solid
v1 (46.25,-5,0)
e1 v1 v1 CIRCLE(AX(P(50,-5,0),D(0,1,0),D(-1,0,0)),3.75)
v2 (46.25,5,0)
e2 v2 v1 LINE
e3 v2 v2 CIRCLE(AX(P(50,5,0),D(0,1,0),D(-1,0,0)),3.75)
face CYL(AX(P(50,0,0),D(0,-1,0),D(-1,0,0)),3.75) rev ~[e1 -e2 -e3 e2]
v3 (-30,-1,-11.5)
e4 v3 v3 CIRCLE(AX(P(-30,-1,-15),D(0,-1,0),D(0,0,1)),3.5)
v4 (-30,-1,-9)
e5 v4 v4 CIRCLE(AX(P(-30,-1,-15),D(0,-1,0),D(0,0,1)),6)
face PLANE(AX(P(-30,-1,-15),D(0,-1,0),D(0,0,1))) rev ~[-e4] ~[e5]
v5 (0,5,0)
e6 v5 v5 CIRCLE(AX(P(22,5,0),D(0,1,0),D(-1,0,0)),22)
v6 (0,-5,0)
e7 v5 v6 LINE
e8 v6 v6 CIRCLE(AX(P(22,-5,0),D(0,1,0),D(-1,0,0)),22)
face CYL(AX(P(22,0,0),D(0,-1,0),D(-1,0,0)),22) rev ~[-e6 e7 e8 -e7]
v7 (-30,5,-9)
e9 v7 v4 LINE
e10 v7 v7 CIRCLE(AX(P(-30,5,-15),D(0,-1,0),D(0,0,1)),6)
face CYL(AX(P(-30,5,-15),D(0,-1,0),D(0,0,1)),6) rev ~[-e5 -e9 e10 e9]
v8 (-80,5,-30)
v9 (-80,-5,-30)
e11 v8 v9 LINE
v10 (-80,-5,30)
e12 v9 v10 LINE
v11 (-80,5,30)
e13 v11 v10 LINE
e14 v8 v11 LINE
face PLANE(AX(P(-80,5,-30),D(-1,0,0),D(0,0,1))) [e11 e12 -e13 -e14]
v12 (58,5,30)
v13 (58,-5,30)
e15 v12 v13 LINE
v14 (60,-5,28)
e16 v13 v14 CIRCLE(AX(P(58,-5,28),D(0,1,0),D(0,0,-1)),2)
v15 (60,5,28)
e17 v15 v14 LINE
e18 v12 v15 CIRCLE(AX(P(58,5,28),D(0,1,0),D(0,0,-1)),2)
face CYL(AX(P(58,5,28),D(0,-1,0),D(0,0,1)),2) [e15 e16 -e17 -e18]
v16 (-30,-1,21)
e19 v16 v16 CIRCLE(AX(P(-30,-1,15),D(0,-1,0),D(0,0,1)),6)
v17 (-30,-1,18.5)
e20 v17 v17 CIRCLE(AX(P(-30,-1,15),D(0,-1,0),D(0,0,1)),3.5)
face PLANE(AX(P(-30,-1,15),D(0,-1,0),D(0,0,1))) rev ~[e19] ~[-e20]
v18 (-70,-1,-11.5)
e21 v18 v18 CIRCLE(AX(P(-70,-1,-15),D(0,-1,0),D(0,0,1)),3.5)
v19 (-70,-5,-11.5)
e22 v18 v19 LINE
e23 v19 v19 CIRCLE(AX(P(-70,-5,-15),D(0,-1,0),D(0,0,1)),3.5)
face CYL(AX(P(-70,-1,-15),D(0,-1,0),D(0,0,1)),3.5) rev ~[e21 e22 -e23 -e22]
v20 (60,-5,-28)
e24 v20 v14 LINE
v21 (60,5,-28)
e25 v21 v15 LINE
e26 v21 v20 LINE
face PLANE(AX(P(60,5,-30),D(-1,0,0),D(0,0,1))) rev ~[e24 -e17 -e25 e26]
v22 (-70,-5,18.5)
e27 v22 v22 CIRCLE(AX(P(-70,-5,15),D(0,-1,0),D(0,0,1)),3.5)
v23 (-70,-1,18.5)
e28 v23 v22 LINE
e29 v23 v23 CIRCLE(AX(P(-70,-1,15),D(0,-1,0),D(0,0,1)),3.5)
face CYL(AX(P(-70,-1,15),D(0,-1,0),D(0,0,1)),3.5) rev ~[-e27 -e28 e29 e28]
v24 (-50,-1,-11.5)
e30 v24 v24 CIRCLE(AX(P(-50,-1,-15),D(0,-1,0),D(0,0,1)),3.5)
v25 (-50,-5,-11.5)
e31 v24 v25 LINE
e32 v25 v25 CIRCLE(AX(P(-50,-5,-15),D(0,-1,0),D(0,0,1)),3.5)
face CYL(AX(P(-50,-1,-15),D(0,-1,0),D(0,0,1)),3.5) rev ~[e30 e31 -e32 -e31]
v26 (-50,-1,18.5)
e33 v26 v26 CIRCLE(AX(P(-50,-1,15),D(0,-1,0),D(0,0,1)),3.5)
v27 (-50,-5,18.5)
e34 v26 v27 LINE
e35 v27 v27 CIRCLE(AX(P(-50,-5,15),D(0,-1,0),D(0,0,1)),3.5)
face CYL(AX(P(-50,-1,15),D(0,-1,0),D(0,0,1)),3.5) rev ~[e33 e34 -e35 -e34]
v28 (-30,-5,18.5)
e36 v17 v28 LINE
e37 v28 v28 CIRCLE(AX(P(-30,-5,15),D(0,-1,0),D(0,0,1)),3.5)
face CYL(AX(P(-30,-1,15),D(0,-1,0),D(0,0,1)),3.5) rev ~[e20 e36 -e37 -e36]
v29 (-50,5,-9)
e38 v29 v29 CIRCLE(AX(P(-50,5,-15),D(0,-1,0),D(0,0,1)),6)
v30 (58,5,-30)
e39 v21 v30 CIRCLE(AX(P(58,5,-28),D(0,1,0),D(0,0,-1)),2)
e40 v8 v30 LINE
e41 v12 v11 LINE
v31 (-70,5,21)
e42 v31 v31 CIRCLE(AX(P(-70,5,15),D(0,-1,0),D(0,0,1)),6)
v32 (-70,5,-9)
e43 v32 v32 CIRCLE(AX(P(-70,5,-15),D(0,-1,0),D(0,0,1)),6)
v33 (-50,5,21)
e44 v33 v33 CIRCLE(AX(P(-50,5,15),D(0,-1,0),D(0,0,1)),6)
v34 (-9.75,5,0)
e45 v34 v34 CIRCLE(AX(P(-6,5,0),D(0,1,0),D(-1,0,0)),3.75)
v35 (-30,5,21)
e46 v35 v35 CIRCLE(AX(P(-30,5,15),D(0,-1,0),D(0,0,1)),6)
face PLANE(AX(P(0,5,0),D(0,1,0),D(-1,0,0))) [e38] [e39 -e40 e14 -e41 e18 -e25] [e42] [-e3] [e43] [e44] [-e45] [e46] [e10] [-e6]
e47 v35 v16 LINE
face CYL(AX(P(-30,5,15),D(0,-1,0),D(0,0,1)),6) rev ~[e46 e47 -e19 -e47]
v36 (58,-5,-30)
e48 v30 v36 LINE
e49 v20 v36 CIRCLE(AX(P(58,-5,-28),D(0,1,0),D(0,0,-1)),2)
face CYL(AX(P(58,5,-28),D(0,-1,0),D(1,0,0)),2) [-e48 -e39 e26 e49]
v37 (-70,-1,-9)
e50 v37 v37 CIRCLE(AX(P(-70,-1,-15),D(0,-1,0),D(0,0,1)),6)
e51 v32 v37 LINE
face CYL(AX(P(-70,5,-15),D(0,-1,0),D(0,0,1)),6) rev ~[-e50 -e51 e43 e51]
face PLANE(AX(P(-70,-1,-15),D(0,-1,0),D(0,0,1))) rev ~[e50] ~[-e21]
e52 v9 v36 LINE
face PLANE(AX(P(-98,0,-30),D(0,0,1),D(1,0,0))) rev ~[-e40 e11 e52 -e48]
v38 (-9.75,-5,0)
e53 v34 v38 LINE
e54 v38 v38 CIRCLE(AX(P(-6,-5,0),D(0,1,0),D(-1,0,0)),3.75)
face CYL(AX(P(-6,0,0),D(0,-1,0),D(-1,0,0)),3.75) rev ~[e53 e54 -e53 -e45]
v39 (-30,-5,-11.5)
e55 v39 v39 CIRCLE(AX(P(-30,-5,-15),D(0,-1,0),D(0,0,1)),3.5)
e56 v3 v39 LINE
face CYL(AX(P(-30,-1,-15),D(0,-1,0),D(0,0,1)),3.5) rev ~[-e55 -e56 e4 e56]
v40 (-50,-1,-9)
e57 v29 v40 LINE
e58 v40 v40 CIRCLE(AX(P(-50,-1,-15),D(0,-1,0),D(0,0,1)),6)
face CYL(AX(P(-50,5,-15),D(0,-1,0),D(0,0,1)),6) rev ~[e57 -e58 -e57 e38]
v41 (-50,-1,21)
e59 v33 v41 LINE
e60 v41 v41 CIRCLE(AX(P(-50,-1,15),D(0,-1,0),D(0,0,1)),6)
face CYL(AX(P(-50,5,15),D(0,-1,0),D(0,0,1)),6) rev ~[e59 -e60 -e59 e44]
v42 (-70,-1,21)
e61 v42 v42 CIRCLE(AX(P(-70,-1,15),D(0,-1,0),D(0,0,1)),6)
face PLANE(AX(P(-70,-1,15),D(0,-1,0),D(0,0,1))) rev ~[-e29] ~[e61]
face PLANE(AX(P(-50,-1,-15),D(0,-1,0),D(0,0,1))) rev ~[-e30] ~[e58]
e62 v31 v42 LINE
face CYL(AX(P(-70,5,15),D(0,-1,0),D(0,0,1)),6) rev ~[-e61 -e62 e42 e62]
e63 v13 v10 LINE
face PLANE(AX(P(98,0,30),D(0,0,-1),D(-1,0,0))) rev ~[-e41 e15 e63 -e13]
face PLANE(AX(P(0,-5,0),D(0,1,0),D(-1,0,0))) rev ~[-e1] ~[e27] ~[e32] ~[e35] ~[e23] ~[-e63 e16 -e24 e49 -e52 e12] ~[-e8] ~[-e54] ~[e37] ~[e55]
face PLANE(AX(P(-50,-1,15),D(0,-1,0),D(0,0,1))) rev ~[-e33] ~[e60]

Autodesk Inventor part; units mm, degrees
ref_plane "YZ Plane" through (0, 0, 0) normal (1, 0, 0) x (0, 1, 0)
ref_plane "XZ Plane" through (0, 0, 0) normal (0, 1, 0) x (-1, 0, 0)
ref_plane "XY Plane" through (0, 0, 0) normal (0, 0, 1) x (1, 0, 0)
sketch "Sketch6" plane through (0, -5, 0) normal (0, -1, 0) x (1, 0, 0)
  circle A0 centre (-30, 15) radius 3.25 projected
  circle A1 centre (-30, -15) radius 3.25 projected
  circle A2 centre (-50, -15) radius 3.25 projected
  circle A3 centre (-50, 15) radius 3.25 projected
  circle A4 centre (-70, 15) radius 3.25 projected
  circle A5 centre (-70, -15) radius 3.25 projected
  point P0 (0, 0)
sketch "Sketch1" plane through (0, 0, 0) normal (0, 1, 0) x (-1, 0, 0)
  line L0 (-98, 30) -> (98, 30)
  line L1 (100, 28) -> (100, -28)
  line L2 (98, -30) -> (-98, -30)
  line L3 (-100, -28) -> (-100, 28)
  line L4 (-100, 30) -> (100, -30) construction
  line L5 (100, 30) -> (-100, -30) construction
  arc A0 (-98, 30) -> (-100, 28) centre (-98, 28) ccw
  arc A1 (100, 28) -> (98, 30) centre (98, 28) ccw
  arc A2 (98, -30) -> (100, -28) centre (98, -28) ccw
  arc A3 (-100, -28) -> (-98, -30) centre (-98, -28) ccw
  circle A4 centre (-22, 0) radius 22
  circle A5 centre (-50, 0) radius 3.75
  circle A6 centre (6, 0) radius 3.75
  circle A7 centre (30, 15) radius 3.25
  circle A8 centre (50, 15) radius 3.25
  circle A9 centre (70, 15) radius 3.25
  circle A10 centre (30, -15) radius 3.25
  circle A11 centre (50, -15) radius 3.25
  circle A12 centre (70, -15) radius 3.25
  point P0 (0, 0)
  point P1 (-100, 0)
  dimension "d0" = 60
  dimension "d1" = 200
  dimension "d2" = 2
  dimension "d3" = 44
  dimension "d4" = 56
  dimension "d5" = 28
  dimension "d6" = 7.5
  dimension "d7" = 7.5
  dimension "d8" = 50
  dimension "d9" = 6.5
  dimension "d10" = 6.5
  dimension "d11" = 6.5
  dimension "d12" = 6.5
  dimension "d13" = 6.5
  dimension "d14" = 6.5
  dimension "d15" = 15
  dimension "d16" = 30
  dimension "d17" = 30
  dimension "d18" = 20
  dimension "d19" = 20
extrude "Plate1" add sketch "Sketch1" along normal mid plane 10 contours L0 A1 L1 A2 L2 A3 L3 A0 | A7 | A8 | A9 | A10 | A11 | A12
sketch "Sketch2" plane through (0, 5, 0) normal (0, 1, 0) x (1, 0, 0)
  line L0 (98, -30) -> (-98, -30) projected
  line L1 (100, 30) -> (60, 30)
  line L2 (60, 30) -> (60, -30)
  line L3 (60, -30) -> (100, -30)
  line L4 (100, -30) -> (100, 30)
  line L5 (100, 28) -> (100, -28) projected
  line L6 (-98, 30) -> (98, 30) projected
  point P0 (0, 0)
  dimension "d21" = 40
extrude "Cut1" cut sketch "Sketch2" against normal blind 10
fillet "Corner Round1" radius 2 2 edges at (60, 0, -30) (60, 0, 30)
sketch "Sketch3" plane through (0, 5, 0) normal (0, 1, 0) x (1, 0, 0)
  circle A0 centre (50, 0) radius 3.75 projected
  circle A1 centre (-6, 0) radius 3.75 projected
  point P0 (0, 0)
sketch "Sketch4" plane through (0, 5, 0) normal (0, 1, 0) x (1, 0, 0)
  line L0 (-100, -28) -> (-100, 28) construction
  line L1 (-98, 30) -> (58, 30) construction
  line L2 (58, -30) -> (-98, -30) projected
  line L3 (-100, 30) -> (-80, 30)
  line L4 (-80, 30) -> (-80, -30)
  line L5 (-80, -30) -> (-100, -30)
  line L6 (-100, -30) -> (-100, 30)
  point P0 (0, 0)
  dimension "d25" = 20
extrude "Cut2" cut sketch "Sketch4" against normal blind 10
sketch "Sketch5" plane through (0, 5, 0) normal (0, 1, 0) x (1, 0, 0)
  point P0 (0, 0)
  point P1 (-30, -15)
  point P2 (-30, -15)
  point P3 (-50, -15)
  point P4 (-50, -15)
  point P5 (-70, -15)
  point P6 (-70, -15)
  point P7 (-70, 15)
  point P8 (-70, 15)
  point P9 (-50, 15)
  point P10 (-50, 15)
  point P11 (-30, 15)
  point P12 (-30, 15)
hole "Hole1" at (-70, 5, 15) at (-70, 5, -15) at (-50, 5, -15) at (-30, 5, -15) at (-30, 5, 15) at (-50, 5, 15) direction (0, -1, 0) diameter 7 end through all counterbore diameter 12 counterbore depth 6
equation "\"d7\" = d6"
equation "\"d10\" = d9"
equation "\"d11\" = d9"
equation "\"d12\" = d9"
equation "\"d13\" = d9"
equation "\"d14\" = d9"
equation "\"d22\" = Thickness"
equation "\"d26\" = Thickness"
equation "\"d20\" = Thickness"
equation "\"BendReliefDepth\" = 0.5 * Thickness"
equation "\"Thickness\" = 10"
properties part number "HCMUTE-CDT23-BAT_TRUC_DAN" material "Stainless Steel"
